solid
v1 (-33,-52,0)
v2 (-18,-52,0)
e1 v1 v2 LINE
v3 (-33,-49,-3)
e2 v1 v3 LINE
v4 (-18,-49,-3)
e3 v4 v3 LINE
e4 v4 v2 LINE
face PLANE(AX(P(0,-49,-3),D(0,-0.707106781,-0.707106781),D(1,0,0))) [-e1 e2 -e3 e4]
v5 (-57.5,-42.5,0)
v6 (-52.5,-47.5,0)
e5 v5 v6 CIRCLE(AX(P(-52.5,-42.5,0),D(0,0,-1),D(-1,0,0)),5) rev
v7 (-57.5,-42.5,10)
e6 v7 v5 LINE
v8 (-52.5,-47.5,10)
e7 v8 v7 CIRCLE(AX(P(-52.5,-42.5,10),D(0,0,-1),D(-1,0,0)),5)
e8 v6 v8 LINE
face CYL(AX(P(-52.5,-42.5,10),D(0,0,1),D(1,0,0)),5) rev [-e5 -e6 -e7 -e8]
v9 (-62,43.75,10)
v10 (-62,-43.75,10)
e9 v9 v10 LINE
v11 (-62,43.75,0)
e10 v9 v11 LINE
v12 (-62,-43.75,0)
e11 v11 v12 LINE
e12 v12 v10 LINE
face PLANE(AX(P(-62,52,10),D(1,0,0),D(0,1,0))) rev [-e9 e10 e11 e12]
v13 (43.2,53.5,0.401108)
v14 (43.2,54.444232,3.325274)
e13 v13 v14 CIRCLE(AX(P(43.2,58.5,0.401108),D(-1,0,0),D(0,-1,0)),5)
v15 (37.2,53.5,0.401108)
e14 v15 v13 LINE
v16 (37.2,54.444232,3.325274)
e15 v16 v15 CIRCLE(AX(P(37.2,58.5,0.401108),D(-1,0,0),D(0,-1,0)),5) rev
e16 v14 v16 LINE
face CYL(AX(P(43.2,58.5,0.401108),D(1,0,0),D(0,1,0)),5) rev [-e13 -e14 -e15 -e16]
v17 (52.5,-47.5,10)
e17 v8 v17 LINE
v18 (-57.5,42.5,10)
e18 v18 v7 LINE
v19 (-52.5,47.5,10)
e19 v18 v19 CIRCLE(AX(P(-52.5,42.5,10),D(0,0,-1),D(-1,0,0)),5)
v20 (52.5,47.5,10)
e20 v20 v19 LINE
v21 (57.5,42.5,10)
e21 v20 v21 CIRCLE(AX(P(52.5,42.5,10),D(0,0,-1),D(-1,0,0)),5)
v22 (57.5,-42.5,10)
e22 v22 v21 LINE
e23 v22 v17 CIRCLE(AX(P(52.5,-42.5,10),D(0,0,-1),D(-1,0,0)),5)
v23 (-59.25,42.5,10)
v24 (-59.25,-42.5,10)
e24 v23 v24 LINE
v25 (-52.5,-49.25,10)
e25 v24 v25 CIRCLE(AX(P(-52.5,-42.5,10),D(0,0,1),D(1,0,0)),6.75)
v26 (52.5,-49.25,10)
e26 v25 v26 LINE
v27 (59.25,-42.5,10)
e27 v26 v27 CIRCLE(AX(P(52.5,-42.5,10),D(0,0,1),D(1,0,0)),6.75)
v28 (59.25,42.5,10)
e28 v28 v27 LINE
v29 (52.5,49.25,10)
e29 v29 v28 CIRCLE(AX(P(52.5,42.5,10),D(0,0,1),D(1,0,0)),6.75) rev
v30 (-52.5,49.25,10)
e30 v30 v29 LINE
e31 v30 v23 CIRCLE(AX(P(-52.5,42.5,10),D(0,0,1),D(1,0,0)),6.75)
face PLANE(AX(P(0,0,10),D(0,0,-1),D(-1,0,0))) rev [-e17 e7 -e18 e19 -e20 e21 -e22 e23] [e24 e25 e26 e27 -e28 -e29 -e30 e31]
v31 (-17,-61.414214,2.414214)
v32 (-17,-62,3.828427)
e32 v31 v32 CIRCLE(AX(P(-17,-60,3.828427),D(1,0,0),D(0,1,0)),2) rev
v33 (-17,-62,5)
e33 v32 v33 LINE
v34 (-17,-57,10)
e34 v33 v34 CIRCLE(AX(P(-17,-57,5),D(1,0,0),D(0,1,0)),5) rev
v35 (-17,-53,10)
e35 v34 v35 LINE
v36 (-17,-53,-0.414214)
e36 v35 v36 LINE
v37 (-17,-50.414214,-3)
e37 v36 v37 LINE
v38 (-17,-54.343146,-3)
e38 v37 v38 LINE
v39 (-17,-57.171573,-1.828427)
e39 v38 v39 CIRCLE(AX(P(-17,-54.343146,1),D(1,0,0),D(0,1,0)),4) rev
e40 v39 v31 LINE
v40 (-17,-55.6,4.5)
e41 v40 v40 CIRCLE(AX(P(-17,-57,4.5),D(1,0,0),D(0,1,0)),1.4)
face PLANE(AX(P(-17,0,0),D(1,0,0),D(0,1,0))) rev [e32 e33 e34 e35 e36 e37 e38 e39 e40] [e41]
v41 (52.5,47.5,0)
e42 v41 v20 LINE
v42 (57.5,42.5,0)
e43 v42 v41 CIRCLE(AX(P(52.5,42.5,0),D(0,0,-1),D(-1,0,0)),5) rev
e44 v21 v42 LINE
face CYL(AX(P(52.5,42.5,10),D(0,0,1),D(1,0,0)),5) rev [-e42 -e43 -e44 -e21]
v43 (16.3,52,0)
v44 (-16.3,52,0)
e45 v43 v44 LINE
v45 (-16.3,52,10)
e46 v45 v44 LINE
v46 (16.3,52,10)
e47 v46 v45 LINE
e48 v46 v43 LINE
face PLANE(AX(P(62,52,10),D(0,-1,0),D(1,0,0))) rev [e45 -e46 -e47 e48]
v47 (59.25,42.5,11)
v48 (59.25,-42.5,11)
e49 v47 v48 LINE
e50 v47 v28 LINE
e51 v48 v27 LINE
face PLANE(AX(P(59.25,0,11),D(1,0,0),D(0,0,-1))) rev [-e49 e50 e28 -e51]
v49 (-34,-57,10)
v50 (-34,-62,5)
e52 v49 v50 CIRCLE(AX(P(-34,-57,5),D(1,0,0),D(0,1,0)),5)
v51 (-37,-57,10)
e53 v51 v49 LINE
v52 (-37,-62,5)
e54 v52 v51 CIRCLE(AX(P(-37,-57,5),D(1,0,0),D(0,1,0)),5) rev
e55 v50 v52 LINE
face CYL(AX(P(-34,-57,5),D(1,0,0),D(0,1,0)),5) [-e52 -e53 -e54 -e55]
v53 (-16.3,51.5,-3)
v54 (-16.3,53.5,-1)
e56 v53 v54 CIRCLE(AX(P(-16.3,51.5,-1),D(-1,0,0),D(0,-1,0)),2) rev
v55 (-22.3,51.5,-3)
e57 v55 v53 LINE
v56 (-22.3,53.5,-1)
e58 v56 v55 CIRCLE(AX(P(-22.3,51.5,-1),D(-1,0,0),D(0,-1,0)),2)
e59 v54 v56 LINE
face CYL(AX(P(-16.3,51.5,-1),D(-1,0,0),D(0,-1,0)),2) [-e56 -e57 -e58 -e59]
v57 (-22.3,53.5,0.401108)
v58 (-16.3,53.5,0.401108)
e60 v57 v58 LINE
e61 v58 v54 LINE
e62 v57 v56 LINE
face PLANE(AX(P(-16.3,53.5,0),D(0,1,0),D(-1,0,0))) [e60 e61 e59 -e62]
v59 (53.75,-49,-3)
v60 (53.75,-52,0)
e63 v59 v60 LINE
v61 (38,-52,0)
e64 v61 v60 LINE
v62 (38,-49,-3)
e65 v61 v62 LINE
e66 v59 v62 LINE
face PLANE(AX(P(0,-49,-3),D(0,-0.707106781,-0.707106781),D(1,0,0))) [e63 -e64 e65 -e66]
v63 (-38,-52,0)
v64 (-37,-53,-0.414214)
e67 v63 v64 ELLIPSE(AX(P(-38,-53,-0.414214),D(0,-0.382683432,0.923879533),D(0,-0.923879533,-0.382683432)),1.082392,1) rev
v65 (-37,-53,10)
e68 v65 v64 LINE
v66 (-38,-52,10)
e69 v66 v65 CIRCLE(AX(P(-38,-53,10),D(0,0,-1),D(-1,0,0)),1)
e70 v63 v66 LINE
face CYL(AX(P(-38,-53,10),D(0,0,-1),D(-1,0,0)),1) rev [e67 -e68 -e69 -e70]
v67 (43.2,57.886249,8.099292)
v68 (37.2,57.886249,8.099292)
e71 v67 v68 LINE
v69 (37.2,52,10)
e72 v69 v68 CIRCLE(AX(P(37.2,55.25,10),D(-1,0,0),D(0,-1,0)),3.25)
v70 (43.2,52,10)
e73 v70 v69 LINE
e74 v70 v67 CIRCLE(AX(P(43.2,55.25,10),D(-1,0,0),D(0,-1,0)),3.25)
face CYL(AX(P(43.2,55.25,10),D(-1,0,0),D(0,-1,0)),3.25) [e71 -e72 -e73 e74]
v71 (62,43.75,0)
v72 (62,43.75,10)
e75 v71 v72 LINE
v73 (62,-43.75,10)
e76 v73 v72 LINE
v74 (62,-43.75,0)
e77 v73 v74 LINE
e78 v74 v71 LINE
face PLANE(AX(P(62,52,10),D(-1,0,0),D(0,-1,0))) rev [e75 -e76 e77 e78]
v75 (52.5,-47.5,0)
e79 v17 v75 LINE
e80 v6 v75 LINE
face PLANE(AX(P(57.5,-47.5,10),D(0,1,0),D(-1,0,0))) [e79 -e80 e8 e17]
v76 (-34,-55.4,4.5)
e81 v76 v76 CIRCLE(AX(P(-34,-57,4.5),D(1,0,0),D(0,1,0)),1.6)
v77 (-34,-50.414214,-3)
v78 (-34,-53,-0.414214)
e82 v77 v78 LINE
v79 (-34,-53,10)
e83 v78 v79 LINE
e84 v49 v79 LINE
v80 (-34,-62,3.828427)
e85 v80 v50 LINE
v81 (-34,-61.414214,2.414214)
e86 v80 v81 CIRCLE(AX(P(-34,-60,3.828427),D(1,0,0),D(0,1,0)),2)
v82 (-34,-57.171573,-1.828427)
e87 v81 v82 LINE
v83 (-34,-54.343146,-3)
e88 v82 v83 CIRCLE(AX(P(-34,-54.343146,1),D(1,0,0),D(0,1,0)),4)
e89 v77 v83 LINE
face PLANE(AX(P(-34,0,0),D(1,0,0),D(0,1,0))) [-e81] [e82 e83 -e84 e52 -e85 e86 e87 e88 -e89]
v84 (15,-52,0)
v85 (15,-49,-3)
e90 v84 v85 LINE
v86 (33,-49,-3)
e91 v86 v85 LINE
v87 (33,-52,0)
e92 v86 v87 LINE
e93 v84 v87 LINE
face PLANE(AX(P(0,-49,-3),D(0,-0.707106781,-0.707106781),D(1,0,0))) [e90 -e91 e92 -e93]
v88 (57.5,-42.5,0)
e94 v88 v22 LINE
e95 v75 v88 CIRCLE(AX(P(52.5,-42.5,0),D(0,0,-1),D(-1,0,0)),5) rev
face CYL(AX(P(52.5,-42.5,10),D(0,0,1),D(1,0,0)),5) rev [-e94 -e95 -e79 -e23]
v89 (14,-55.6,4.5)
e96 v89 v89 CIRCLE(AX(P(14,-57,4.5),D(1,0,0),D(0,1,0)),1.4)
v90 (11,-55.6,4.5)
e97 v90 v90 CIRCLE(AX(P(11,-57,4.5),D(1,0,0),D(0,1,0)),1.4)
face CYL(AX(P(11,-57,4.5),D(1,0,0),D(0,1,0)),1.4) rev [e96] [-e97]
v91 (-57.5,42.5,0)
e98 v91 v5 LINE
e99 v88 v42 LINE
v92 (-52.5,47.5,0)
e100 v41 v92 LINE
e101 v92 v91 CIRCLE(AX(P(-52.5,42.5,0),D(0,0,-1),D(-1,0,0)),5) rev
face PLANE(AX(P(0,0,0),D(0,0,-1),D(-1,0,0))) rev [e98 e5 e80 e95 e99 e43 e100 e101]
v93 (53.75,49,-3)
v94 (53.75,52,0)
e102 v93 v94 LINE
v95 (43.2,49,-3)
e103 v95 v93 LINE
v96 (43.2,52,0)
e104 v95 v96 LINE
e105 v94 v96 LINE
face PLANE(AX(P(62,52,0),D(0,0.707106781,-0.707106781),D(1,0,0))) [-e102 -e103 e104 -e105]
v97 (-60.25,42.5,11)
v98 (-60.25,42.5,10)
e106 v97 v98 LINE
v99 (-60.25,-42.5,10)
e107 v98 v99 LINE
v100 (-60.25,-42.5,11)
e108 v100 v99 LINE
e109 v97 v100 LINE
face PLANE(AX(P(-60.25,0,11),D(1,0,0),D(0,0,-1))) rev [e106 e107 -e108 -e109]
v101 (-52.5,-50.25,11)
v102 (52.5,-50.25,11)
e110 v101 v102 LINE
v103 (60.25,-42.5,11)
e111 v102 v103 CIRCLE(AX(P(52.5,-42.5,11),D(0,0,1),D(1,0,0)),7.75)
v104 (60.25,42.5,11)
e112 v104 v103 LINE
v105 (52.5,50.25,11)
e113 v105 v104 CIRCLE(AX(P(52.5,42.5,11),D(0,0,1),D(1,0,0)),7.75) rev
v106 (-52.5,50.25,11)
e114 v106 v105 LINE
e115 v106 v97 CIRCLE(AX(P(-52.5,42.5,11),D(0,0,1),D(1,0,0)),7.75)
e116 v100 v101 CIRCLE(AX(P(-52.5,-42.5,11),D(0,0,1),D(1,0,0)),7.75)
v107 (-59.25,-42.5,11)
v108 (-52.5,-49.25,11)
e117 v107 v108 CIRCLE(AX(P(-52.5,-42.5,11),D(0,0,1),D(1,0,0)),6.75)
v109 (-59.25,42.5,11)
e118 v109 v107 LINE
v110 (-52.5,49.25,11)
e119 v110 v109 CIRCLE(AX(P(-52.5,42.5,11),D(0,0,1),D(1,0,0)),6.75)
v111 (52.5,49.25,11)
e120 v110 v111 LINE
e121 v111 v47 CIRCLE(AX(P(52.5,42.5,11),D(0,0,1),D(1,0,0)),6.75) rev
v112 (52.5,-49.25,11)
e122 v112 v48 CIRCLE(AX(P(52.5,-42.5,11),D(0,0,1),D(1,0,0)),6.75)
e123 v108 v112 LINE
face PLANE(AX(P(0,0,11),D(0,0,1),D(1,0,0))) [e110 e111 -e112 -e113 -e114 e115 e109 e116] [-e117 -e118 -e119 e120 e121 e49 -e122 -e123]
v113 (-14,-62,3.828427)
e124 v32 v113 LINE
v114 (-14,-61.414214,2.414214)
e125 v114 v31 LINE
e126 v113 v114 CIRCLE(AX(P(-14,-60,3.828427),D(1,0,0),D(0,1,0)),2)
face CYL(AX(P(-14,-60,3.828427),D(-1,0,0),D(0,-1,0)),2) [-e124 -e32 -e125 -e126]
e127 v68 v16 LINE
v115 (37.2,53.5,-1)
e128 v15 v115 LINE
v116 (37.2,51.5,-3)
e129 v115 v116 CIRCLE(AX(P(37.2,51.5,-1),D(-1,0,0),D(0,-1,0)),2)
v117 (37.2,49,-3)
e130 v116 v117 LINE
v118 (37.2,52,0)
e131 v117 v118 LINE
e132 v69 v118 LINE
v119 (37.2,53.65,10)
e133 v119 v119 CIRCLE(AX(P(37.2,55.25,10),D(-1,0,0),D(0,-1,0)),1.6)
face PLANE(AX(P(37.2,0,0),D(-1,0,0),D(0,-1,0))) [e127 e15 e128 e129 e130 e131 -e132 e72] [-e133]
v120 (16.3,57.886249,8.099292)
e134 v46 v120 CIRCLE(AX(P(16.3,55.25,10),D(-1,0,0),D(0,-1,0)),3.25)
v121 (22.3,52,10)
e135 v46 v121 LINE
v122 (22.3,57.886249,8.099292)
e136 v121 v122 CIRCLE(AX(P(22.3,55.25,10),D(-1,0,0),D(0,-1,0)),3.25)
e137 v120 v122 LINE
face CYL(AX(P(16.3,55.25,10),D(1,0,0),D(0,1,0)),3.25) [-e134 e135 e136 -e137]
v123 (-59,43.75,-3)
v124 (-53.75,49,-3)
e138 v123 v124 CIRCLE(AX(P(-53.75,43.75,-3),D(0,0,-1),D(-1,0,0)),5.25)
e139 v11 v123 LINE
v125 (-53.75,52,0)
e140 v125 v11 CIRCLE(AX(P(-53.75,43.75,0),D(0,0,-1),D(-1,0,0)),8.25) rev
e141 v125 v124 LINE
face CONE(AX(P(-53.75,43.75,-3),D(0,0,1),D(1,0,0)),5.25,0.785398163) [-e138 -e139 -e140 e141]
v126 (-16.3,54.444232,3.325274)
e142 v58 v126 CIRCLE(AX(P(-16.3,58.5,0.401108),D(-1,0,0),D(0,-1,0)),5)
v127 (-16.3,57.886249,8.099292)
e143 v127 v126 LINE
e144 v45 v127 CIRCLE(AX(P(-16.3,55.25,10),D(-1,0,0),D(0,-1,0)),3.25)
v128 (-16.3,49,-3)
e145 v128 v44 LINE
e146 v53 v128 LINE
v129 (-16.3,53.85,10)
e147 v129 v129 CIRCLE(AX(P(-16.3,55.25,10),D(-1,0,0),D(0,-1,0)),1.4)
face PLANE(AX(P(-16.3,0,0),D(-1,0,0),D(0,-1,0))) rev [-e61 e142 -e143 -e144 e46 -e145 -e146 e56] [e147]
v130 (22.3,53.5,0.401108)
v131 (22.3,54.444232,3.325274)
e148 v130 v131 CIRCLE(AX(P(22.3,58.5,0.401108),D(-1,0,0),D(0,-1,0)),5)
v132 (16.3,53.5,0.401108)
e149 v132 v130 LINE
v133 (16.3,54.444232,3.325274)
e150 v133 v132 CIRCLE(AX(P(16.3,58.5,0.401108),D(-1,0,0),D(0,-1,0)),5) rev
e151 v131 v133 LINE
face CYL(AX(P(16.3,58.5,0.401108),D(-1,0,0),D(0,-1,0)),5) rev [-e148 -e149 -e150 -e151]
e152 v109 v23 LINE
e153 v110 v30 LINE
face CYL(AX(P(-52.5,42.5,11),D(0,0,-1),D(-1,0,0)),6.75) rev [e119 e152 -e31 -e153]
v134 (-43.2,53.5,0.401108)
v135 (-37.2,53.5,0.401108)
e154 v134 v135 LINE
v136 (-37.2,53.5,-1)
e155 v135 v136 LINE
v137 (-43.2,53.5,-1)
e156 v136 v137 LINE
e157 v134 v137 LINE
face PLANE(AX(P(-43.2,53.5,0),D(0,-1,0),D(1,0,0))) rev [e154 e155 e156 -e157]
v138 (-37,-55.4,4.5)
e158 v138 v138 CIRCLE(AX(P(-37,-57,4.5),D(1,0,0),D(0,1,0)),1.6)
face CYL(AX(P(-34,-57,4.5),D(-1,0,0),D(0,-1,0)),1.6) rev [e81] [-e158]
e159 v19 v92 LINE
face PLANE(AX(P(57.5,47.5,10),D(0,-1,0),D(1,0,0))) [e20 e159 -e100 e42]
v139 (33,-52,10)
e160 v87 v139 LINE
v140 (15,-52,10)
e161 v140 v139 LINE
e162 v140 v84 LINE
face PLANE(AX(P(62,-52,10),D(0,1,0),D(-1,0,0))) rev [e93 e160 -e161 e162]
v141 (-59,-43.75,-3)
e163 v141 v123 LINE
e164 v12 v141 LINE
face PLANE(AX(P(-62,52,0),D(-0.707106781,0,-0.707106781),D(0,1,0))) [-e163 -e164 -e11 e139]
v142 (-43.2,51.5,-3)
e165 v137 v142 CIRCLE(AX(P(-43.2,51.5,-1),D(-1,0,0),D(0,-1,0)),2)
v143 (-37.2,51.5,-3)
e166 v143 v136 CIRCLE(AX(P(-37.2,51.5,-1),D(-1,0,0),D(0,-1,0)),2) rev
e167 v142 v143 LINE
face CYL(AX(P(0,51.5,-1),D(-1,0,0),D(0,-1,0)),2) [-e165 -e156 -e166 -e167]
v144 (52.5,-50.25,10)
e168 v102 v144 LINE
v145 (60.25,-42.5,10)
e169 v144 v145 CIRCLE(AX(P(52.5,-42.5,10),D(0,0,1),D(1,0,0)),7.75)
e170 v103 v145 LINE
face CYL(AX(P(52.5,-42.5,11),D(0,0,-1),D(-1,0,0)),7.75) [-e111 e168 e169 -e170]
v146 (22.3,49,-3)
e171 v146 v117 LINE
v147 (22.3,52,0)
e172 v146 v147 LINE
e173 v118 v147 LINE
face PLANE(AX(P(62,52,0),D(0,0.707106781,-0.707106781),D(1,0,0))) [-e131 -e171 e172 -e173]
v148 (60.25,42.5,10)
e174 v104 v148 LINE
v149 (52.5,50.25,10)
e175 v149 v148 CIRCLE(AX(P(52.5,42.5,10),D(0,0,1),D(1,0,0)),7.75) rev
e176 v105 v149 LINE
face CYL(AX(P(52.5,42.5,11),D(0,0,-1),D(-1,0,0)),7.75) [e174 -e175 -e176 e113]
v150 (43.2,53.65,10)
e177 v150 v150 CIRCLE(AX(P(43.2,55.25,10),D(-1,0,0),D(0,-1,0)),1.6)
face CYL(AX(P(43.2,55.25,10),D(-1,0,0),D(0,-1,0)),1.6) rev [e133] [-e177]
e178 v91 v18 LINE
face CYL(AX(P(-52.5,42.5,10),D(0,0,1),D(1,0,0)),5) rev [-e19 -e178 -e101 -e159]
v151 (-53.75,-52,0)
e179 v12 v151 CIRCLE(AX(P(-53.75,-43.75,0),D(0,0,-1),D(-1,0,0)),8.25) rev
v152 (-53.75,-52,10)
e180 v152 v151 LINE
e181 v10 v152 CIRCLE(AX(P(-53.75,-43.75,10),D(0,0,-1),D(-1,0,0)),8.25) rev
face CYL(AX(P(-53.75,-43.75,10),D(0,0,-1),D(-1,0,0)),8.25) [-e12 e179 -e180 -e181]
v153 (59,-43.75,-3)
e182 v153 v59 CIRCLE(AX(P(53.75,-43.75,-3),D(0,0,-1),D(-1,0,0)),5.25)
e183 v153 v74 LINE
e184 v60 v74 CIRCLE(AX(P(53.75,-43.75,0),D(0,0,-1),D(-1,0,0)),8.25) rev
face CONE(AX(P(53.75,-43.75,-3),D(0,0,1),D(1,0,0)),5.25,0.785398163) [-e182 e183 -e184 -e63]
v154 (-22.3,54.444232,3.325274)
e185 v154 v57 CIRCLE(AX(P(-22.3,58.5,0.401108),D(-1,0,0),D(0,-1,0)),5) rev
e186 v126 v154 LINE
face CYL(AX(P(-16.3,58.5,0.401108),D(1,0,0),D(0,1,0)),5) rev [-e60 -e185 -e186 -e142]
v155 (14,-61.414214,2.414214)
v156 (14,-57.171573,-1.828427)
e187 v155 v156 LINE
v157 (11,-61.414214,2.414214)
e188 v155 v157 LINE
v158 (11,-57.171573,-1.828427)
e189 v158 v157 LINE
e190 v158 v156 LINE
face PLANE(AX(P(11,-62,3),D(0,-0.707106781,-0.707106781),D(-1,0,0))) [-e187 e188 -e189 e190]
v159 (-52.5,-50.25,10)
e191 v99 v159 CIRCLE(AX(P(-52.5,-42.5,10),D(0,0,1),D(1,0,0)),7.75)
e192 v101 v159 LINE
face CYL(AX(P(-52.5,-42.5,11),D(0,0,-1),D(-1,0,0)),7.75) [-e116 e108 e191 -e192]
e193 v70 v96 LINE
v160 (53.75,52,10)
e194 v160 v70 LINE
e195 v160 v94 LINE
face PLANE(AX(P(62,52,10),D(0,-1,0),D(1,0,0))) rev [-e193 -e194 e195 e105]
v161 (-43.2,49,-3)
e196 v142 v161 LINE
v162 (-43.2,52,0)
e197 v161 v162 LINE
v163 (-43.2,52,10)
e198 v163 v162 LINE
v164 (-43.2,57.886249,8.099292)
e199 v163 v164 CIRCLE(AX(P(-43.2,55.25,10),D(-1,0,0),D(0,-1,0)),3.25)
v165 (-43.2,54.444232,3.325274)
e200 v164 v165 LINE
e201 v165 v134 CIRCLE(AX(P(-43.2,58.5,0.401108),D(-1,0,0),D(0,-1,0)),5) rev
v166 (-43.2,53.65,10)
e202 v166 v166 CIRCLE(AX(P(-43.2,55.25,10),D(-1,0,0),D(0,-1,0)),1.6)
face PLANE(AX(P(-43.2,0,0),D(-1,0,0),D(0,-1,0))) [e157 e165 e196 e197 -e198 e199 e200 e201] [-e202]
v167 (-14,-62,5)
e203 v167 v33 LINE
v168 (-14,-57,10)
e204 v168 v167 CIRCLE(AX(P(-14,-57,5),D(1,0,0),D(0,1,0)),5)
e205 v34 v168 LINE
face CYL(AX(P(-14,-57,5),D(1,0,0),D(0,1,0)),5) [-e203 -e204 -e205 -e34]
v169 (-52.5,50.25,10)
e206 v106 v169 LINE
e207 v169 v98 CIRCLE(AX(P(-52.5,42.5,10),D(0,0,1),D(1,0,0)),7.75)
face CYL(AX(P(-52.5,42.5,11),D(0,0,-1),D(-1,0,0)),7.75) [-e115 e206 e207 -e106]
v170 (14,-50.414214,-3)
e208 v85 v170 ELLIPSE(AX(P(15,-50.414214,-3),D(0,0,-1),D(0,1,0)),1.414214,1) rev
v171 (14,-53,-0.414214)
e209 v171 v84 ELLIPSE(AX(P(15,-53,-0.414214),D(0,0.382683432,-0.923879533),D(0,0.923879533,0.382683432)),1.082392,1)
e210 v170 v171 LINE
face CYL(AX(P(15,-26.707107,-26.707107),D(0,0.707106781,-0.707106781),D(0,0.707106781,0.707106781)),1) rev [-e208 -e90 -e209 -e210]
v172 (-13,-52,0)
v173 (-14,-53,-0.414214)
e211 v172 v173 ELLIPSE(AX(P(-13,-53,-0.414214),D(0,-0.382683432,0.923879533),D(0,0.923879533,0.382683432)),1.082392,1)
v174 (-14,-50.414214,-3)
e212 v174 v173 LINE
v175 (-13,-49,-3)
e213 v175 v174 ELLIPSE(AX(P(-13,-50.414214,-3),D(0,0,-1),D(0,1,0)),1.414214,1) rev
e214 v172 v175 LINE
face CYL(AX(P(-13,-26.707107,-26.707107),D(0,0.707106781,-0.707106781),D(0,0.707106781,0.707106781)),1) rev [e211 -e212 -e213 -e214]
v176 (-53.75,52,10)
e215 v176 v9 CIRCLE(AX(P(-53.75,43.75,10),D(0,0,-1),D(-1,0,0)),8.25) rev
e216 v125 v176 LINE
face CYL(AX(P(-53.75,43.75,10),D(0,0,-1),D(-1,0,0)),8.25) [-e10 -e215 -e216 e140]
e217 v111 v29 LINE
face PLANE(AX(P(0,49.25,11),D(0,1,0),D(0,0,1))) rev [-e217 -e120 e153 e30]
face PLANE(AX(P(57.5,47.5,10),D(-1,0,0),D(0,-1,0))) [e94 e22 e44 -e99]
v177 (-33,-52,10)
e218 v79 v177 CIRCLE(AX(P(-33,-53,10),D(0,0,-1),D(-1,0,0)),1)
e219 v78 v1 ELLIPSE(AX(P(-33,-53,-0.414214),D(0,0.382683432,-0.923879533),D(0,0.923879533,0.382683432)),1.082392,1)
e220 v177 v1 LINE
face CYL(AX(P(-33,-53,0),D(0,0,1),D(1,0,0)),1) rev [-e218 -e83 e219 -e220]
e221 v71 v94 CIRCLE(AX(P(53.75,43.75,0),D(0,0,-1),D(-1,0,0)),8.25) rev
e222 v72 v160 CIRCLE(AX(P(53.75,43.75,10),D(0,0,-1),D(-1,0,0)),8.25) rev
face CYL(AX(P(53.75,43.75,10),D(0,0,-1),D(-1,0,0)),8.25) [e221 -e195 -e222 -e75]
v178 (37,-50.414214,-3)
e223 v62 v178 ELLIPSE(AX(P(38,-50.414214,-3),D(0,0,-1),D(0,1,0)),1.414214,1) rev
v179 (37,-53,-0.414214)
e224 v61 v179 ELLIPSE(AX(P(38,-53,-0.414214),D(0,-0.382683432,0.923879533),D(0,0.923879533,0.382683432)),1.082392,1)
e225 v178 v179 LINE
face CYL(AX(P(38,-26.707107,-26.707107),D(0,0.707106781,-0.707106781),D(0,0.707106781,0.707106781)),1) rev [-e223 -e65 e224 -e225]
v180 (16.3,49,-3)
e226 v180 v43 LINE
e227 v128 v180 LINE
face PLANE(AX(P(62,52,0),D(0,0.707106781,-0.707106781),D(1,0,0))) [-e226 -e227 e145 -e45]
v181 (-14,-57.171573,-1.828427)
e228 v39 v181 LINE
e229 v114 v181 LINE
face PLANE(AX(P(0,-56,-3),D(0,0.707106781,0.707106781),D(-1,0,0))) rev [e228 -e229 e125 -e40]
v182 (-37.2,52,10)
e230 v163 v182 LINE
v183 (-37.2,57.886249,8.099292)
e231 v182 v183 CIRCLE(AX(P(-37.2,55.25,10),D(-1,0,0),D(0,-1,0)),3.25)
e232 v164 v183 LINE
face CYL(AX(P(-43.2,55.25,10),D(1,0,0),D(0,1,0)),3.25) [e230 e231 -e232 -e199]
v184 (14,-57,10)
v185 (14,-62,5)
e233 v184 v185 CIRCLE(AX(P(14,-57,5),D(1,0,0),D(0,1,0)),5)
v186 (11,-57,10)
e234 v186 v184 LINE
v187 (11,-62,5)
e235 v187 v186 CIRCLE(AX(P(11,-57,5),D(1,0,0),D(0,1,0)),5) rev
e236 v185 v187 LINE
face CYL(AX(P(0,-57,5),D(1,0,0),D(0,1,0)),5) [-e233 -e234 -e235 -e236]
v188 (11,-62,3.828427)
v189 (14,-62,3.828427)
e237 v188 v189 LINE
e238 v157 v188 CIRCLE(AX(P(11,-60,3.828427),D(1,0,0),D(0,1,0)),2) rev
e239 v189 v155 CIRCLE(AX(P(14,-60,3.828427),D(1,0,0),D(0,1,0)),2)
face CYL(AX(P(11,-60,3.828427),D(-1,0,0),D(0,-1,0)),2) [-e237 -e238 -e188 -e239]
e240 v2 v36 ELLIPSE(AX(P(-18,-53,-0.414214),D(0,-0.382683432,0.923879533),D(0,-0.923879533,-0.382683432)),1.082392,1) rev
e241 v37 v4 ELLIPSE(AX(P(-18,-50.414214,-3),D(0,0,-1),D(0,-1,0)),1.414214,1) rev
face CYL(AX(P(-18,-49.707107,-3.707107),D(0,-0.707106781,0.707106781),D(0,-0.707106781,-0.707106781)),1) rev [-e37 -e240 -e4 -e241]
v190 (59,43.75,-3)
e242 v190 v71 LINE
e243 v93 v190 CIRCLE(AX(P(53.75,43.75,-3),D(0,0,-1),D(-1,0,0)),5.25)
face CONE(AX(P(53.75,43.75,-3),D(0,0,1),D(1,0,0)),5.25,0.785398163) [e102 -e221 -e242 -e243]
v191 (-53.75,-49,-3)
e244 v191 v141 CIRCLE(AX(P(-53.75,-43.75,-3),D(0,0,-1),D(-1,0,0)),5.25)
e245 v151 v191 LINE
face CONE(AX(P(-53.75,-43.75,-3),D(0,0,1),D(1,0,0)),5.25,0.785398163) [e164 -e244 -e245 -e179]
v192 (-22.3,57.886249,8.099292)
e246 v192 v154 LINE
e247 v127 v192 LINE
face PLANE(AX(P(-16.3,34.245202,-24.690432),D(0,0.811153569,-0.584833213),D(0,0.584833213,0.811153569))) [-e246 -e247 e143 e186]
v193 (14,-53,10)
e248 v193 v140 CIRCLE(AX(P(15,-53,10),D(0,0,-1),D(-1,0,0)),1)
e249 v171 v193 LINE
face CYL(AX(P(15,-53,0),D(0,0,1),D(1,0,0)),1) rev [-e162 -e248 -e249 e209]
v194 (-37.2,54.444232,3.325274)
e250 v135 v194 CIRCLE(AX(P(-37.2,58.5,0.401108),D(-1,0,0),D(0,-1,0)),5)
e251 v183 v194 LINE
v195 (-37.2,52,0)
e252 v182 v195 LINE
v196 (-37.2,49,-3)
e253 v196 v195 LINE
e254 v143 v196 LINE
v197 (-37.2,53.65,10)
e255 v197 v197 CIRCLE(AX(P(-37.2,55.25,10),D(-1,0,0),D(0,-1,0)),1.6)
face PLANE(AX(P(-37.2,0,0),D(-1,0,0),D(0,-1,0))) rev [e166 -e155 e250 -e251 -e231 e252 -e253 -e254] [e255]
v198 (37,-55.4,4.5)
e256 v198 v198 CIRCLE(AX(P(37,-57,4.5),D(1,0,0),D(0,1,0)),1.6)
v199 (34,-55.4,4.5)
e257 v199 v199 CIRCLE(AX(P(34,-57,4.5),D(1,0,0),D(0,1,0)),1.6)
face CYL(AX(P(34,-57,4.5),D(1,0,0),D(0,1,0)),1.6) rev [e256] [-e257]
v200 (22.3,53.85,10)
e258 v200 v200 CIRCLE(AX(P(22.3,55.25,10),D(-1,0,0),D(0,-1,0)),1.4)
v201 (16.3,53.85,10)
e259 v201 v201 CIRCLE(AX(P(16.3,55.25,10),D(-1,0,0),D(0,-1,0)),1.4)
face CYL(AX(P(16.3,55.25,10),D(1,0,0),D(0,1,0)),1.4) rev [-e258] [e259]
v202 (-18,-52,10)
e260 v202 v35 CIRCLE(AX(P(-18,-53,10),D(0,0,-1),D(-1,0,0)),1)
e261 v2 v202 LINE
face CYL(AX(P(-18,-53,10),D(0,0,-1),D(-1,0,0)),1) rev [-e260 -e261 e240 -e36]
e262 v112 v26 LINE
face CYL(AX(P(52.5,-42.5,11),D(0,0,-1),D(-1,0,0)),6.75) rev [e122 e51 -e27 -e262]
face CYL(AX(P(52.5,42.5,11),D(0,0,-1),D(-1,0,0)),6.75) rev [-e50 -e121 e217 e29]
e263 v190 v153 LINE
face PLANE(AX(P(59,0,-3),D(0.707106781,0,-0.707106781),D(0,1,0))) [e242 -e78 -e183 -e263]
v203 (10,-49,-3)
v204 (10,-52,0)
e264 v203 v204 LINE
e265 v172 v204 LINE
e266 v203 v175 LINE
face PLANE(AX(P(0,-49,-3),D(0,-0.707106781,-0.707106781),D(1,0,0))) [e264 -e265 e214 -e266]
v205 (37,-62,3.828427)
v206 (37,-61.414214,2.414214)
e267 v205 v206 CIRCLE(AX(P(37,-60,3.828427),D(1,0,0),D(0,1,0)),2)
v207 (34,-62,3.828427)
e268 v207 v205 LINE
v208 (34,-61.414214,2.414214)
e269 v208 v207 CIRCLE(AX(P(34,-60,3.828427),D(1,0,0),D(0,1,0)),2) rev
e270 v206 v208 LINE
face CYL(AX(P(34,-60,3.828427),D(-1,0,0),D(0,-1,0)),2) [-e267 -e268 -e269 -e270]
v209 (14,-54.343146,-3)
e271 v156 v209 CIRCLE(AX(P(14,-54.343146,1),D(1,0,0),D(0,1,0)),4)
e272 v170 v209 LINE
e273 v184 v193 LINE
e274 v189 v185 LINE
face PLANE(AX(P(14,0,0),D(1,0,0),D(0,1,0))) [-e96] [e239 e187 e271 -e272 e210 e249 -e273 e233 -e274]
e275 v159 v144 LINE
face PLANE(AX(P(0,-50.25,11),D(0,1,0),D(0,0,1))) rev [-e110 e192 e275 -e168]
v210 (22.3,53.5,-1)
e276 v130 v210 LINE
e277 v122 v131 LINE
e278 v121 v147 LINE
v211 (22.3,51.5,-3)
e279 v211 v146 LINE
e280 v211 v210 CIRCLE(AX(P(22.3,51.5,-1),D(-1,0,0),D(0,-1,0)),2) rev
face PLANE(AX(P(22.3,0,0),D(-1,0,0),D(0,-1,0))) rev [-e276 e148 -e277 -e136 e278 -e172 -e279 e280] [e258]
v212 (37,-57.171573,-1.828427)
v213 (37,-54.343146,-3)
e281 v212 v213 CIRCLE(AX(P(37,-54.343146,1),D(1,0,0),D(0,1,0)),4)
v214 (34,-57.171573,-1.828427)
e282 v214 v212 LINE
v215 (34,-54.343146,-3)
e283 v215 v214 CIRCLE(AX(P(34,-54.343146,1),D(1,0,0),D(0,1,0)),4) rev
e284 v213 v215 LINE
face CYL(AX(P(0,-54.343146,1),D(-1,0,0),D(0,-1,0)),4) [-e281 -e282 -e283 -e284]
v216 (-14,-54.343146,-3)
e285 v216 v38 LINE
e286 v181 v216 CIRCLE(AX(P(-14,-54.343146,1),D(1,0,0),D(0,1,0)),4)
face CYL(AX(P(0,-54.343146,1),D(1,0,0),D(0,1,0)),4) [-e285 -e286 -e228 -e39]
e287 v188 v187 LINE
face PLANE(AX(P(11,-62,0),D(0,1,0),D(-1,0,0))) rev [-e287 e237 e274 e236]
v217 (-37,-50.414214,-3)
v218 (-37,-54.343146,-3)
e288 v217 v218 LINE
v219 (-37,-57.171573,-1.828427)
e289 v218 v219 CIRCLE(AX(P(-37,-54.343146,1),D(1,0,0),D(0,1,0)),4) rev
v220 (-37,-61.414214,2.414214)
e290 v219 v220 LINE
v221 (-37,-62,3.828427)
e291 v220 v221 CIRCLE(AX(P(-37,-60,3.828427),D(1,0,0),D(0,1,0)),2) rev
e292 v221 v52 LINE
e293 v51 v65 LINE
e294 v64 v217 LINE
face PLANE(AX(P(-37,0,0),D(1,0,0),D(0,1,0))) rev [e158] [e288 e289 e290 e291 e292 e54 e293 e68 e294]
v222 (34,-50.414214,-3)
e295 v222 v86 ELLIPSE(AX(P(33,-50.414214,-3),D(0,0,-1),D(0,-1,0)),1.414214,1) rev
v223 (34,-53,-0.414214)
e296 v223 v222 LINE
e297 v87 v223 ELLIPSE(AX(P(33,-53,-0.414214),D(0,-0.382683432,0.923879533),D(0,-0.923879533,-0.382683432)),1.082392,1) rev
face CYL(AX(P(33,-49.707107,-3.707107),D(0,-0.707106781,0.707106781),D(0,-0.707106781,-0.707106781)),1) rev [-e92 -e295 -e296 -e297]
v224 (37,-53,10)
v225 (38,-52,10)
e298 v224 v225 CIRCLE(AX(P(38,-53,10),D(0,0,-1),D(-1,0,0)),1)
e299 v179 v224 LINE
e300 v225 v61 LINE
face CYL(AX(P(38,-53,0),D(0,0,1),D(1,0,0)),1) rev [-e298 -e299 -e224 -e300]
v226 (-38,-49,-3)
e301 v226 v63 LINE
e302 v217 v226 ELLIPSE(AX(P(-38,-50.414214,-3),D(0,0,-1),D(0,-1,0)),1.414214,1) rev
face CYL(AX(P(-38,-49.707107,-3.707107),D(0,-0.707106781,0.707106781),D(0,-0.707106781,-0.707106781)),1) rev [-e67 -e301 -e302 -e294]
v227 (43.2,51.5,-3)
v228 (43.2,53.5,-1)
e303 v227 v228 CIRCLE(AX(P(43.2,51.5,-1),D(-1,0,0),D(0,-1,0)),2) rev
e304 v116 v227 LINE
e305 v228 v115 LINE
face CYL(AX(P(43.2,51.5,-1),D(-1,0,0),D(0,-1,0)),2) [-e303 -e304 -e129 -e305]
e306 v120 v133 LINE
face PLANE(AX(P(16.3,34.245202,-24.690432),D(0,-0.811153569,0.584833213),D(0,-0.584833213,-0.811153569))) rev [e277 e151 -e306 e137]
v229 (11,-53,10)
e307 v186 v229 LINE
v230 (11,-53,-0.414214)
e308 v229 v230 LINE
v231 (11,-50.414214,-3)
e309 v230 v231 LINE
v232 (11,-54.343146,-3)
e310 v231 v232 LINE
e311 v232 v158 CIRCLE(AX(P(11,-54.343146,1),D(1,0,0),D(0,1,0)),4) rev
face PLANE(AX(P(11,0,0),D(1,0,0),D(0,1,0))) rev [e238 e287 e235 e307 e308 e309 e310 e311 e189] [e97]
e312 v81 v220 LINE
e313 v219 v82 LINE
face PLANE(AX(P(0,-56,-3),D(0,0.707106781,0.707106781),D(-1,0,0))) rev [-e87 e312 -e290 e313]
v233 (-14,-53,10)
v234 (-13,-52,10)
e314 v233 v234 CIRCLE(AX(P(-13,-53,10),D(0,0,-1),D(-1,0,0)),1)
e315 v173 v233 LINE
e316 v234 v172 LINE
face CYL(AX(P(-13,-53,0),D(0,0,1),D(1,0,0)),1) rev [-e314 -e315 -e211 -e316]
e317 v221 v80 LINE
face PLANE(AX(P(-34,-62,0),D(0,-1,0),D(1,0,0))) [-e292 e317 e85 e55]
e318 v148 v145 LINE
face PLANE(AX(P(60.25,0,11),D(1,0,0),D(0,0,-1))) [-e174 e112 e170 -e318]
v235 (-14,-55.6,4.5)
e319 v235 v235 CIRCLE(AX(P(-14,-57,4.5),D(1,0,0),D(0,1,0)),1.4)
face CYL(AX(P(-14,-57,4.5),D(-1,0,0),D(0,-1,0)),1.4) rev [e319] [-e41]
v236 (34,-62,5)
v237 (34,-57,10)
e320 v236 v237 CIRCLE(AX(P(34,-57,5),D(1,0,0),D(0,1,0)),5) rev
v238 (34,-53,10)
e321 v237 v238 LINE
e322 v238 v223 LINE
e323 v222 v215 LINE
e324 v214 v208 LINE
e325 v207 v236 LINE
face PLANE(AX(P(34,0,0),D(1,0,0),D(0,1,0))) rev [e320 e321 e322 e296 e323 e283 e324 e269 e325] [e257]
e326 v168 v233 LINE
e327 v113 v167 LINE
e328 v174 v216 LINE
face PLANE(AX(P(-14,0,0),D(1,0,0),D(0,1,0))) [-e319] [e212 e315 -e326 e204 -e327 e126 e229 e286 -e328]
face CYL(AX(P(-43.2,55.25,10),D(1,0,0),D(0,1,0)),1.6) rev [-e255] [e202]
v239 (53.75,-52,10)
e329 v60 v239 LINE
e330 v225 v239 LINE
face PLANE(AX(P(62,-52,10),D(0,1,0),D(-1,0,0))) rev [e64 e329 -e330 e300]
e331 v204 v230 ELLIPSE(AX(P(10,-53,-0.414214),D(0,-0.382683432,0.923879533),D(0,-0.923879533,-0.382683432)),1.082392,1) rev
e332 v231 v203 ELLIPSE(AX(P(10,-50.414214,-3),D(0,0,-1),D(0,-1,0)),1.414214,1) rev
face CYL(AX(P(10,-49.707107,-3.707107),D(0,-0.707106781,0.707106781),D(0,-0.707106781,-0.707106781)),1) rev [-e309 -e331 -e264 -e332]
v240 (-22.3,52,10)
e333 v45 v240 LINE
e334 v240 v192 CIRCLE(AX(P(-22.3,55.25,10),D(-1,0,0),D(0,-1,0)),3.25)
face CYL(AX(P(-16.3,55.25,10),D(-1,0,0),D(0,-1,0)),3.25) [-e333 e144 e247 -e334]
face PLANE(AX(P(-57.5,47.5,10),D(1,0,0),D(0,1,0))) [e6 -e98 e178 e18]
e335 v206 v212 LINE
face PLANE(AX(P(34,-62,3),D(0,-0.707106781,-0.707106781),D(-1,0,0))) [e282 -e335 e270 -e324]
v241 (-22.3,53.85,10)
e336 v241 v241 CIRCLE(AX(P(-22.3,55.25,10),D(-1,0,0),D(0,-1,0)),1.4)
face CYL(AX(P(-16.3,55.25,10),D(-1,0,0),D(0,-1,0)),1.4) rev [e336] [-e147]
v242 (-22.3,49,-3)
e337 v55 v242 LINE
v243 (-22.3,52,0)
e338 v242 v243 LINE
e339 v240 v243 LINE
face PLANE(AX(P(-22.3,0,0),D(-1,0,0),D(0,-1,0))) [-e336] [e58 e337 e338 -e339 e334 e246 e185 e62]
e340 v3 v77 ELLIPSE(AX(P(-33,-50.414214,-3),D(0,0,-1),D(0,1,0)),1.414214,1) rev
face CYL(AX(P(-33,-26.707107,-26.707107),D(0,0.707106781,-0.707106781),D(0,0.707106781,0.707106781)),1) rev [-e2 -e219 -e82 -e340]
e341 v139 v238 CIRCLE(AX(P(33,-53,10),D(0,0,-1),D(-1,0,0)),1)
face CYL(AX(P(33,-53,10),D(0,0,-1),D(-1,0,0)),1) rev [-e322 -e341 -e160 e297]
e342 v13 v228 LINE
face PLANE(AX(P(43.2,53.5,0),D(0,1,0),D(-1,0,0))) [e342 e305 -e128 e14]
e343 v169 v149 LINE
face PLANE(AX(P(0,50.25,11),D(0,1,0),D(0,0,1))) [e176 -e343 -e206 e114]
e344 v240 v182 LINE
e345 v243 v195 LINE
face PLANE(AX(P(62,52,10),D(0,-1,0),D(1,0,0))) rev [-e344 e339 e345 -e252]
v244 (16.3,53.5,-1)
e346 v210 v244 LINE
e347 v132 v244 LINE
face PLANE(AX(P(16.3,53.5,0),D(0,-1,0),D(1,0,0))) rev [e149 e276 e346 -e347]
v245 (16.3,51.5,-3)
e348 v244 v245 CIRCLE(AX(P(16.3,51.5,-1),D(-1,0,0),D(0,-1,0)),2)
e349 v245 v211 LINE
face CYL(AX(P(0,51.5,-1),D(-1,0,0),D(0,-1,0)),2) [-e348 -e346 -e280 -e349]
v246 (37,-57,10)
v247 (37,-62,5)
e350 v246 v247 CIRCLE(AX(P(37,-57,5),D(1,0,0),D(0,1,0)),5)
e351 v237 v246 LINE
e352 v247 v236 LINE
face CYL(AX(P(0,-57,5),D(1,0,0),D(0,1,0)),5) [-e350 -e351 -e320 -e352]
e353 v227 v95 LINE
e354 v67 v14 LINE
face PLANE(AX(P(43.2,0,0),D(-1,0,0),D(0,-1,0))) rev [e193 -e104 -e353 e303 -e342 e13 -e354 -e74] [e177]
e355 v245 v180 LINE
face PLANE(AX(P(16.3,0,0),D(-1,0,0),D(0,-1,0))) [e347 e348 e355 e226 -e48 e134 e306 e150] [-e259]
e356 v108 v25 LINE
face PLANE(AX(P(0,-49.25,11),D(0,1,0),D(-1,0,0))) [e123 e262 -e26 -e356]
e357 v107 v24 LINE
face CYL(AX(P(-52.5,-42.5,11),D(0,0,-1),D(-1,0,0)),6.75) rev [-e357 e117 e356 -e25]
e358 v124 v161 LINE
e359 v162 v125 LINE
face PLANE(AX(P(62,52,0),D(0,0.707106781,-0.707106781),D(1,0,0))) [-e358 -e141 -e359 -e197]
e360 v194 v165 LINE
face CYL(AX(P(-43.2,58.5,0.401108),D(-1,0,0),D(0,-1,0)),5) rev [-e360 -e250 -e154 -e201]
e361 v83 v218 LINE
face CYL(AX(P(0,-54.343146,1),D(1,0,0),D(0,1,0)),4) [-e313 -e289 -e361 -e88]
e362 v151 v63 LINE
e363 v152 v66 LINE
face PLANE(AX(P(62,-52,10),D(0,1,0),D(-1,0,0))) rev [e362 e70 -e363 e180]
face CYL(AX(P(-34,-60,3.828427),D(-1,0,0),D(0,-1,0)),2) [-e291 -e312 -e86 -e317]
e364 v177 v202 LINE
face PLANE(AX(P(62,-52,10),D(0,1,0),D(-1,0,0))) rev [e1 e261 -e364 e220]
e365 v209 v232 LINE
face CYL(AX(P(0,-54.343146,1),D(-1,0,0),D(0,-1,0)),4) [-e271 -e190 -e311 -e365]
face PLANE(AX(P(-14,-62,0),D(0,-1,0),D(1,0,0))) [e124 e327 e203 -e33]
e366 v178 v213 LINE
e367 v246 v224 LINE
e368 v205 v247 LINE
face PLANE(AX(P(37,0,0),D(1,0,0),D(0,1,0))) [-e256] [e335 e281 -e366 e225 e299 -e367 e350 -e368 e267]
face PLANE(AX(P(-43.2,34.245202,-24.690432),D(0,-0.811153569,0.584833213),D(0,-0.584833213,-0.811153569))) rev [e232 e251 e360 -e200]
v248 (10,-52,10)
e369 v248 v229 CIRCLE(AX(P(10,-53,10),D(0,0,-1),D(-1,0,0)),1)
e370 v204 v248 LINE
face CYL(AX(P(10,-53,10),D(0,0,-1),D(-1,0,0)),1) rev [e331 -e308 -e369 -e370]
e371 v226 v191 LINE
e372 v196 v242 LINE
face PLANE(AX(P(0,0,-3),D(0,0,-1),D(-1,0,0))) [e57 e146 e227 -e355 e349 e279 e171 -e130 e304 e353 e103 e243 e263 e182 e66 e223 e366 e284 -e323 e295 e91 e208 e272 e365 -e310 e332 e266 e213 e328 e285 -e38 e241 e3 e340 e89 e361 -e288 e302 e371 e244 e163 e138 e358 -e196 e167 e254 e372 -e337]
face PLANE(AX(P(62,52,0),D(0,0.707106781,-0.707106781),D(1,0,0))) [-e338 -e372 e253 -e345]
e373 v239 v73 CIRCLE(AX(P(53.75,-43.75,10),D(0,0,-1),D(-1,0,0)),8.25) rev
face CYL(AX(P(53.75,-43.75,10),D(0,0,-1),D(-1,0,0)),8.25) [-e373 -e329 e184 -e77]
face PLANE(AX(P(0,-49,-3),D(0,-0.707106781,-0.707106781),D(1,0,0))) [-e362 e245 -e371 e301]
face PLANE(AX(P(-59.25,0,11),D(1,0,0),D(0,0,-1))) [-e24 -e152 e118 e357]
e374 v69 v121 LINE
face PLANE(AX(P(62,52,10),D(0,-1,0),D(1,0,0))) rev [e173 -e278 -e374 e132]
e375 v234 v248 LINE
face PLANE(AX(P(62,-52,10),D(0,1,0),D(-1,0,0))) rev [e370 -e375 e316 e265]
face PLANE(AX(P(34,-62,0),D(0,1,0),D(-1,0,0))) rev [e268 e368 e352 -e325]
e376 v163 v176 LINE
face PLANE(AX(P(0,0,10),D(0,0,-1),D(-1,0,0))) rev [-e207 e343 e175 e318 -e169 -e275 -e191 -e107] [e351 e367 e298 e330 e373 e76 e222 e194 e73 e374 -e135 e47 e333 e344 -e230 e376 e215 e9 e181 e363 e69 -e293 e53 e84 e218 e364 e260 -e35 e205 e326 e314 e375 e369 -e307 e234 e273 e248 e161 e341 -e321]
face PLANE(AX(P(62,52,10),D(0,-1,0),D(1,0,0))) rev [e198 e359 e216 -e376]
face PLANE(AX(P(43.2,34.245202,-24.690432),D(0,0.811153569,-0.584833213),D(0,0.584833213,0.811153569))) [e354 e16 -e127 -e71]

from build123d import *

# Parameters (mm, degrees)
SKETCH1_W            = 124
SKETCH1_H            = 104
SKETCH1_W_2          = 115
SKETCH1_H_2          = 95
BOSS_EXTRUDE1_DEPTH  = 10
SKETCH1_2_W          = 124
SKETCH1_2_H          = 104
BOSS_EXTRUDE2_DEPTH  = 3
FILLET1_R            = 8.25
FILLET2_R            = 5
BOSS_EXTRUDE3_DEPTH  = 1
CHAMFER1_SIZE        = 3
BOSS_EXTRUDE4_START  = -24.8
SKETCH3_R            = 1.6
BOSS_EXTRUDE4_DEPTH  = 6
BOSS_EXTRUDE5_START  = -105.2
SKETCH3_4_R          = 1.6
BOSS_EXTRUDE5_DEPTH  = 6
BOSS_EXTRUDE6_START  = -45.7
SKETCH3_6_R          = 1.4
BOSS_EXTRUDE6_DEPTH  = 6
BOSS_EXTRUDE7_START  = -84.3
SKETCH3_7_R          = 1.4
BOSS_EXTRUDE7_DEPTH  = 6
FILLET3_R            = 2
FILLET4_R            = 5
BOSS_EXTRUDE8_START  = -25
SKETCH4_R            = 1.6
BOSS_EXTRUDE8_DEPTH  = 3
BOSS_EXTRUDE9_START  = -96
SKETCH4_3_R          = 1.6
BOSS_EXTRUDE9_DEPTH  = 3
BOSS_EXTRUDE10_START = -48
SKETCH4_5_R          = 1.4
BOSS_EXTRUDE10_DEPTH = 3
BOSS_EXTRUDE11_START = -76
SKETCH4_6_R          = 1.4
BOSS_EXTRUDE11_DEPTH = 3
CHAMFER2_SIZE        = 6
FILLET5_R            = 5
FILLET6_R            = 2
FILLET7_R            = 1
FILLET8_R            = 4


with BuildPart() as part:
    # Sketch1 → Boss-Extrude1 (new body)
    with BuildSketch(Plane.XY):
        Rectangle(SKETCH1_W, SKETCH1_H)
        Rectangle(SKETCH1_W_2, SKETCH1_H_2, mode=Mode.SUBTRACT)
    extrude(amount=BOSS_EXTRUDE1_DEPTH)

    # Sketch1<2> → Boss-Extrude2 (add)
    with BuildSketch(Plane.XY):
        Rectangle(SKETCH1_2_W, SKETCH1_2_H)
    extrude(amount=-BOSS_EXTRUDE2_DEPTH)

    # Fillet1
    fillet1_edges = [part.edges().sort_by_distance(p)[0] for p in [
        (62, -52, 3.5),
        (-62, -52, 3.5),
        (-62, 52, 3.5),
        (62, 52, 3.5),
    ]]
    fillet(fillet1_edges, radius=FILLET1_R)

    # Fillet2
    fillet2_edges = [part.edges().sort_by_distance(p)[0] for p in [
        (57.5, -47.5, 5),
        (-57.5, 47.5, 5),
        (-57.5, -47.5, 5),
        (57.5, 47.5, 5),
    ]]
    fillet(fillet2_edges, radius=FILLET2_R)

    # Sketch2 → Boss-Extrude3 (add)
    with BuildSketch(Plane.XY.offset(10)):
        with BuildLine():
            Line((52.5, 50.25), (-52.5, 50.25))
            ThreePointArc((-52.5, 50.25), (-57.980077554, 47.980077554), (-60.25, 42.5))
            Line((-60.25, 42.5), (-60.25, -42.5))
            ThreePointArc((-60.25, -42.5), (-57.980077554, -47.980077554), (-52.5, -50.25))
            Line((-52.5, -50.25), (52.5, -50.25))
            ThreePointArc((52.5, -50.25), (57.980077554, -47.980077554), (60.25, -42.5))
            Line((60.25, -42.5), (60.25, 42.5))
            ThreePointArc((60.25, 42.5), (57.980077554, 47.980077554), (52.5, 50.25))
        make_face()
        with BuildLine():
            ThreePointArc((-59.25, 42.5), (-57.272970773, 47.272970773), (-52.5, 49.25))
            Line((-52.5, 49.25), (52.5, 49.25))
            ThreePointArc((52.5, 49.25), (57.272970773, 47.272970773), (59.25, 42.5))
            Line((59.25, 42.5), (59.25, -42.5))
            ThreePointArc((59.25, -42.5), (57.272970773, -47.272970773), (52.5, -49.25))
            Line((52.5, -49.25), (-52.5, -49.25))
            ThreePointArc((-52.5, -49.25), (-57.272970773, -47.272970773), (-59.25, -42.5))
            Line((-59.25, -42.5), (-59.25, 42.5))
        make_face(mode=Mode.SUBTRACT)
    extrude(amount=BOSS_EXTRUDE3_DEPTH)

    # Chamfer1
    chamfer1_edges = [part.edges().sort_by_distance(p)[0] for p in [
        (0, -52, -3),
        (59.583630945, -49.583630945, -3),
        (-59.583630945, -49.583630945, -3),
        (62, 0, -3),
        (-62, 0, -3),
        (59.583630945, 49.583630945, -3),
        (-59.583630945, 49.583630945, -3),
        (0, 52, -3),
    ]]
    chamfer(chamfer1_edges, length=CHAMFER1_SIZE)

    # Sketch3 → Boss-Extrude4 (add)
    with BuildSketch(Plane.ZY.offset(62).offset(BOSS_EXTRUDE4_START)):
        with BuildLine():
            Line((0, 52), (10, 52))
            ThreePointArc((10, 52), (13.092758443, 56.248671724), (8.099292057, 57.8862491))
            Line((8.099292057, 57.8862491), (2.015640289, 53.5))
            Line((2.015640289, 53.5), (-3, 53.5))
            Line((-3, 53.5), (-3, 49))
            Line((-3, 49), (0, 52))
        make_face()
        with Locations((10, 55.25)):
            Circle(SKETCH3_R, mode=Mode.SUBTRACT)
    extrude(amount=BOSS_EXTRUDE4_DEPTH)

    # Sketch3<4> → Boss-Extrude5 (add)
    with BuildSketch(Plane.ZY.offset(62).offset(BOSS_EXTRUDE5_START)):
        with BuildLine():
            Line((0, 52), (10, 52))
            ThreePointArc((10, 52), (13.092758443, 56.248671724), (8.099292057, 57.8862491))
            Line((8.099292057, 57.8862491), (2.015640289, 53.5))
            Line((2.015640289, 53.5), (-3, 53.5))
            Line((-3, 53.5), (-3, 49))
            Line((-3, 49), (0, 52))
        make_face()
        with Locations((10, 55.25)):
            Circle(SKETCH3_4_R, mode=Mode.SUBTRACT)
    extrude(amount=BOSS_EXTRUDE5_DEPTH)

    # Sketch3<6> → Boss-Extrude6 (add)
    with BuildSketch(Plane.ZY.offset(62).offset(BOSS_EXTRUDE6_START)):
        with BuildLine():
            Line((0, 52), (10, 52))
            ThreePointArc((10, 52), (13.092758443, 56.248671724), (8.099292057, 57.8862491))
            Line((8.099292057, 57.8862491), (2.015640289, 53.5))
            Line((2.015640289, 53.5), (-3, 53.5))
            Line((-3, 53.5), (-3, 49))
            Line((-3, 49), (0, 52))
        make_face()
        with Locations((10, 55.25)):
            Circle(SKETCH3_6_R, mode=Mode.SUBTRACT)
    extrude(amount=BOSS_EXTRUDE6_DEPTH)

    # Sketch3<7> → Boss-Extrude7 (add)
    with BuildSketch(Plane.ZY.offset(62).offset(BOSS_EXTRUDE7_START)):
        with BuildLine():
            Line((0, 52), (10, 52))
            ThreePointArc((10, 52), (13.092758443, 56.248671724), (8.099292057, 57.8862491))
            Line((8.099292057, 57.8862491), (2.015640289, 53.5))
            Line((2.015640289, 53.5), (-3, 53.5))
            Line((-3, 53.5), (-3, 49))
            Line((-3, 49), (0, 52))
        make_face()
        with Locations((10, 55.25)):
            Circle(SKETCH3_7_R, mode=Mode.SUBTRACT)
    extrude(amount=BOSS_EXTRUDE7_DEPTH)

    # Fillet3
    fillet3_edges = [part.edges().sort_by_distance(p)[0] for p in [
        (-40.2, 53.5, -3),
        (-19.3, 53.5, -3),
        (19.3, 53.5, -3),
        (40.2, 53.5, -3),
    ]]
    fillet(fillet3_edges, radius=FILLET3_R)

    # Fillet4
    fillet4_edges = [part.edges().sort_by_distance(p)[0] for p in [
        (-40.2, 53.5, 2.015640289),
        (-19.3, 53.5, 2.015640289),
        (19.3, 53.5, 2.015640289),
        (40.2, 53.5, 2.015640289),
    ]]
    fillet(fillet4_edges, radius=FILLET4_R)

    # Sketch4 → Boss-Extrude8 (add)
    with BuildSketch(Plane(origin=(62, 0, 0), x_dir=(0, 0, -1), z_dir=(1, 0, 0)).offset(BOSS_EXTRUDE8_START)):
        Polygon((3, -49), (0, -52), (-10, -52), (-10, -62), (3, -62), align=None)
        with Locations((-4.5, -57)):
            Circle(SKETCH4_R, mode=Mode.SUBTRACT)
    extrude(amount=-BOSS_EXTRUDE8_DEPTH)

    # Sketch4<3> → Boss-Extrude9 (add)
    with BuildSketch(Plane(origin=(62, 0, 0), x_dir=(0, 0, -1), z_dir=(1, 0, 0)).offset(BOSS_EXTRUDE9_START)):
        Polygon((3, -49), (0, -52), (-10, -52), (-10, -62), (3, -62), align=None)
        with Locations((-4.5, -57)):
            Circle(SKETCH4_3_R, mode=Mode.SUBTRACT)
    extrude(amount=-BOSS_EXTRUDE9_DEPTH)

    # Sketch4<5> → Boss-Extrude10 (add)
    with BuildSketch(Plane(origin=(62, 0, 0), x_dir=(0, 0, -1), z_dir=(1, 0, 0)).offset(BOSS_EXTRUDE10_START)):
        Polygon((3, -49), (0, -52), (-10, -52), (-10, -62), (3, -62), align=None)
        with Locations((-4.5, -57)):
            Circle(SKETCH4_5_R, mode=Mode.SUBTRACT)
    extrude(amount=-BOSS_EXTRUDE10_DEPTH)

    # Sketch4<6> → Boss-Extrude11 (add)
    with BuildSketch(Plane(origin=(62, 0, 0), x_dir=(0, 0, -1), z_dir=(1, 0, 0)).offset(BOSS_EXTRUDE11_START)):
        Polygon((3, -49), (0, -52), (-10, -52), (-10, -62), (3, -62), align=None)
        with Locations((-4.5, -57)):
            Circle(SKETCH4_6_R, mode=Mode.SUBTRACT)
    extrude(amount=-BOSS_EXTRUDE11_DEPTH)

    # Chamfer2
    chamfer2_edges = [part.edges().sort_by_distance(p)[0] for p in [
        (-35.5, -62, -3),
        (-15.5, -62, -3),
        (12.5, -62, -3),
        (35.5, -62, -3),
    ]]
    chamfer(chamfer2_edges, length=CHAMFER2_SIZE)

    # Fillet5
    fillet5_edges = [part.edges().sort_by_distance(p)[0] for p in [
        (-35.5, -62, 10),
        (-15.5, -62, 10),
        (12.5, -62, 10),
        (35.5, -62, 10),
    ]]
    fillet(fillet5_edges, radius=FILLET5_R)

    # Fillet6
    fillet6_edges = [part.edges().sort_by_distance(p)[0] for p in [
        (35.5, -62, 3),
        (12.5, -62, 3),
        (-15.5, -62, 3),
        (-35.5, -62, 3),
    ]]
    fillet(fillet6_edges, radius=FILLET6_R)

    # Fillet7
    fillet7_edges = [part.edges().sort_by_distance(p)[0] for p in [
        (-34, -52, 5),
        (-34, -50.5, -1.5),
        (-37, -52, 5),
        (-37, -50.5, -1.5),
        (-17, -52, 5),
        (-17, -50.5, -1.5),
        (-14, -50.5, -1.5),
        (-14, -52, 5),
        (11, -52, 5),
        (11, -50.5, -1.5),
        (14, -52, 5),
        (14, -50.5, -1.5),
        (34, -52, 5),
        (34, -50.5, -1.5),
        (37, -50.5, -1.5),
        (37, -52, 5),
    ]]
    fillet(fillet7_edges, radius=FILLET7_R)

    # Fillet8
    fillet8_edges = [part.edges().sort_by_distance(p)[0] for p in [
        (35.5, -56, -3),
        (12.5, -56, -3),
        (-15.5, -56, -3),
        (-35.5, -56, -3),
    ]]
    fillet(fillet8_edges, radius=FILLET8_R)


solid = part.part
